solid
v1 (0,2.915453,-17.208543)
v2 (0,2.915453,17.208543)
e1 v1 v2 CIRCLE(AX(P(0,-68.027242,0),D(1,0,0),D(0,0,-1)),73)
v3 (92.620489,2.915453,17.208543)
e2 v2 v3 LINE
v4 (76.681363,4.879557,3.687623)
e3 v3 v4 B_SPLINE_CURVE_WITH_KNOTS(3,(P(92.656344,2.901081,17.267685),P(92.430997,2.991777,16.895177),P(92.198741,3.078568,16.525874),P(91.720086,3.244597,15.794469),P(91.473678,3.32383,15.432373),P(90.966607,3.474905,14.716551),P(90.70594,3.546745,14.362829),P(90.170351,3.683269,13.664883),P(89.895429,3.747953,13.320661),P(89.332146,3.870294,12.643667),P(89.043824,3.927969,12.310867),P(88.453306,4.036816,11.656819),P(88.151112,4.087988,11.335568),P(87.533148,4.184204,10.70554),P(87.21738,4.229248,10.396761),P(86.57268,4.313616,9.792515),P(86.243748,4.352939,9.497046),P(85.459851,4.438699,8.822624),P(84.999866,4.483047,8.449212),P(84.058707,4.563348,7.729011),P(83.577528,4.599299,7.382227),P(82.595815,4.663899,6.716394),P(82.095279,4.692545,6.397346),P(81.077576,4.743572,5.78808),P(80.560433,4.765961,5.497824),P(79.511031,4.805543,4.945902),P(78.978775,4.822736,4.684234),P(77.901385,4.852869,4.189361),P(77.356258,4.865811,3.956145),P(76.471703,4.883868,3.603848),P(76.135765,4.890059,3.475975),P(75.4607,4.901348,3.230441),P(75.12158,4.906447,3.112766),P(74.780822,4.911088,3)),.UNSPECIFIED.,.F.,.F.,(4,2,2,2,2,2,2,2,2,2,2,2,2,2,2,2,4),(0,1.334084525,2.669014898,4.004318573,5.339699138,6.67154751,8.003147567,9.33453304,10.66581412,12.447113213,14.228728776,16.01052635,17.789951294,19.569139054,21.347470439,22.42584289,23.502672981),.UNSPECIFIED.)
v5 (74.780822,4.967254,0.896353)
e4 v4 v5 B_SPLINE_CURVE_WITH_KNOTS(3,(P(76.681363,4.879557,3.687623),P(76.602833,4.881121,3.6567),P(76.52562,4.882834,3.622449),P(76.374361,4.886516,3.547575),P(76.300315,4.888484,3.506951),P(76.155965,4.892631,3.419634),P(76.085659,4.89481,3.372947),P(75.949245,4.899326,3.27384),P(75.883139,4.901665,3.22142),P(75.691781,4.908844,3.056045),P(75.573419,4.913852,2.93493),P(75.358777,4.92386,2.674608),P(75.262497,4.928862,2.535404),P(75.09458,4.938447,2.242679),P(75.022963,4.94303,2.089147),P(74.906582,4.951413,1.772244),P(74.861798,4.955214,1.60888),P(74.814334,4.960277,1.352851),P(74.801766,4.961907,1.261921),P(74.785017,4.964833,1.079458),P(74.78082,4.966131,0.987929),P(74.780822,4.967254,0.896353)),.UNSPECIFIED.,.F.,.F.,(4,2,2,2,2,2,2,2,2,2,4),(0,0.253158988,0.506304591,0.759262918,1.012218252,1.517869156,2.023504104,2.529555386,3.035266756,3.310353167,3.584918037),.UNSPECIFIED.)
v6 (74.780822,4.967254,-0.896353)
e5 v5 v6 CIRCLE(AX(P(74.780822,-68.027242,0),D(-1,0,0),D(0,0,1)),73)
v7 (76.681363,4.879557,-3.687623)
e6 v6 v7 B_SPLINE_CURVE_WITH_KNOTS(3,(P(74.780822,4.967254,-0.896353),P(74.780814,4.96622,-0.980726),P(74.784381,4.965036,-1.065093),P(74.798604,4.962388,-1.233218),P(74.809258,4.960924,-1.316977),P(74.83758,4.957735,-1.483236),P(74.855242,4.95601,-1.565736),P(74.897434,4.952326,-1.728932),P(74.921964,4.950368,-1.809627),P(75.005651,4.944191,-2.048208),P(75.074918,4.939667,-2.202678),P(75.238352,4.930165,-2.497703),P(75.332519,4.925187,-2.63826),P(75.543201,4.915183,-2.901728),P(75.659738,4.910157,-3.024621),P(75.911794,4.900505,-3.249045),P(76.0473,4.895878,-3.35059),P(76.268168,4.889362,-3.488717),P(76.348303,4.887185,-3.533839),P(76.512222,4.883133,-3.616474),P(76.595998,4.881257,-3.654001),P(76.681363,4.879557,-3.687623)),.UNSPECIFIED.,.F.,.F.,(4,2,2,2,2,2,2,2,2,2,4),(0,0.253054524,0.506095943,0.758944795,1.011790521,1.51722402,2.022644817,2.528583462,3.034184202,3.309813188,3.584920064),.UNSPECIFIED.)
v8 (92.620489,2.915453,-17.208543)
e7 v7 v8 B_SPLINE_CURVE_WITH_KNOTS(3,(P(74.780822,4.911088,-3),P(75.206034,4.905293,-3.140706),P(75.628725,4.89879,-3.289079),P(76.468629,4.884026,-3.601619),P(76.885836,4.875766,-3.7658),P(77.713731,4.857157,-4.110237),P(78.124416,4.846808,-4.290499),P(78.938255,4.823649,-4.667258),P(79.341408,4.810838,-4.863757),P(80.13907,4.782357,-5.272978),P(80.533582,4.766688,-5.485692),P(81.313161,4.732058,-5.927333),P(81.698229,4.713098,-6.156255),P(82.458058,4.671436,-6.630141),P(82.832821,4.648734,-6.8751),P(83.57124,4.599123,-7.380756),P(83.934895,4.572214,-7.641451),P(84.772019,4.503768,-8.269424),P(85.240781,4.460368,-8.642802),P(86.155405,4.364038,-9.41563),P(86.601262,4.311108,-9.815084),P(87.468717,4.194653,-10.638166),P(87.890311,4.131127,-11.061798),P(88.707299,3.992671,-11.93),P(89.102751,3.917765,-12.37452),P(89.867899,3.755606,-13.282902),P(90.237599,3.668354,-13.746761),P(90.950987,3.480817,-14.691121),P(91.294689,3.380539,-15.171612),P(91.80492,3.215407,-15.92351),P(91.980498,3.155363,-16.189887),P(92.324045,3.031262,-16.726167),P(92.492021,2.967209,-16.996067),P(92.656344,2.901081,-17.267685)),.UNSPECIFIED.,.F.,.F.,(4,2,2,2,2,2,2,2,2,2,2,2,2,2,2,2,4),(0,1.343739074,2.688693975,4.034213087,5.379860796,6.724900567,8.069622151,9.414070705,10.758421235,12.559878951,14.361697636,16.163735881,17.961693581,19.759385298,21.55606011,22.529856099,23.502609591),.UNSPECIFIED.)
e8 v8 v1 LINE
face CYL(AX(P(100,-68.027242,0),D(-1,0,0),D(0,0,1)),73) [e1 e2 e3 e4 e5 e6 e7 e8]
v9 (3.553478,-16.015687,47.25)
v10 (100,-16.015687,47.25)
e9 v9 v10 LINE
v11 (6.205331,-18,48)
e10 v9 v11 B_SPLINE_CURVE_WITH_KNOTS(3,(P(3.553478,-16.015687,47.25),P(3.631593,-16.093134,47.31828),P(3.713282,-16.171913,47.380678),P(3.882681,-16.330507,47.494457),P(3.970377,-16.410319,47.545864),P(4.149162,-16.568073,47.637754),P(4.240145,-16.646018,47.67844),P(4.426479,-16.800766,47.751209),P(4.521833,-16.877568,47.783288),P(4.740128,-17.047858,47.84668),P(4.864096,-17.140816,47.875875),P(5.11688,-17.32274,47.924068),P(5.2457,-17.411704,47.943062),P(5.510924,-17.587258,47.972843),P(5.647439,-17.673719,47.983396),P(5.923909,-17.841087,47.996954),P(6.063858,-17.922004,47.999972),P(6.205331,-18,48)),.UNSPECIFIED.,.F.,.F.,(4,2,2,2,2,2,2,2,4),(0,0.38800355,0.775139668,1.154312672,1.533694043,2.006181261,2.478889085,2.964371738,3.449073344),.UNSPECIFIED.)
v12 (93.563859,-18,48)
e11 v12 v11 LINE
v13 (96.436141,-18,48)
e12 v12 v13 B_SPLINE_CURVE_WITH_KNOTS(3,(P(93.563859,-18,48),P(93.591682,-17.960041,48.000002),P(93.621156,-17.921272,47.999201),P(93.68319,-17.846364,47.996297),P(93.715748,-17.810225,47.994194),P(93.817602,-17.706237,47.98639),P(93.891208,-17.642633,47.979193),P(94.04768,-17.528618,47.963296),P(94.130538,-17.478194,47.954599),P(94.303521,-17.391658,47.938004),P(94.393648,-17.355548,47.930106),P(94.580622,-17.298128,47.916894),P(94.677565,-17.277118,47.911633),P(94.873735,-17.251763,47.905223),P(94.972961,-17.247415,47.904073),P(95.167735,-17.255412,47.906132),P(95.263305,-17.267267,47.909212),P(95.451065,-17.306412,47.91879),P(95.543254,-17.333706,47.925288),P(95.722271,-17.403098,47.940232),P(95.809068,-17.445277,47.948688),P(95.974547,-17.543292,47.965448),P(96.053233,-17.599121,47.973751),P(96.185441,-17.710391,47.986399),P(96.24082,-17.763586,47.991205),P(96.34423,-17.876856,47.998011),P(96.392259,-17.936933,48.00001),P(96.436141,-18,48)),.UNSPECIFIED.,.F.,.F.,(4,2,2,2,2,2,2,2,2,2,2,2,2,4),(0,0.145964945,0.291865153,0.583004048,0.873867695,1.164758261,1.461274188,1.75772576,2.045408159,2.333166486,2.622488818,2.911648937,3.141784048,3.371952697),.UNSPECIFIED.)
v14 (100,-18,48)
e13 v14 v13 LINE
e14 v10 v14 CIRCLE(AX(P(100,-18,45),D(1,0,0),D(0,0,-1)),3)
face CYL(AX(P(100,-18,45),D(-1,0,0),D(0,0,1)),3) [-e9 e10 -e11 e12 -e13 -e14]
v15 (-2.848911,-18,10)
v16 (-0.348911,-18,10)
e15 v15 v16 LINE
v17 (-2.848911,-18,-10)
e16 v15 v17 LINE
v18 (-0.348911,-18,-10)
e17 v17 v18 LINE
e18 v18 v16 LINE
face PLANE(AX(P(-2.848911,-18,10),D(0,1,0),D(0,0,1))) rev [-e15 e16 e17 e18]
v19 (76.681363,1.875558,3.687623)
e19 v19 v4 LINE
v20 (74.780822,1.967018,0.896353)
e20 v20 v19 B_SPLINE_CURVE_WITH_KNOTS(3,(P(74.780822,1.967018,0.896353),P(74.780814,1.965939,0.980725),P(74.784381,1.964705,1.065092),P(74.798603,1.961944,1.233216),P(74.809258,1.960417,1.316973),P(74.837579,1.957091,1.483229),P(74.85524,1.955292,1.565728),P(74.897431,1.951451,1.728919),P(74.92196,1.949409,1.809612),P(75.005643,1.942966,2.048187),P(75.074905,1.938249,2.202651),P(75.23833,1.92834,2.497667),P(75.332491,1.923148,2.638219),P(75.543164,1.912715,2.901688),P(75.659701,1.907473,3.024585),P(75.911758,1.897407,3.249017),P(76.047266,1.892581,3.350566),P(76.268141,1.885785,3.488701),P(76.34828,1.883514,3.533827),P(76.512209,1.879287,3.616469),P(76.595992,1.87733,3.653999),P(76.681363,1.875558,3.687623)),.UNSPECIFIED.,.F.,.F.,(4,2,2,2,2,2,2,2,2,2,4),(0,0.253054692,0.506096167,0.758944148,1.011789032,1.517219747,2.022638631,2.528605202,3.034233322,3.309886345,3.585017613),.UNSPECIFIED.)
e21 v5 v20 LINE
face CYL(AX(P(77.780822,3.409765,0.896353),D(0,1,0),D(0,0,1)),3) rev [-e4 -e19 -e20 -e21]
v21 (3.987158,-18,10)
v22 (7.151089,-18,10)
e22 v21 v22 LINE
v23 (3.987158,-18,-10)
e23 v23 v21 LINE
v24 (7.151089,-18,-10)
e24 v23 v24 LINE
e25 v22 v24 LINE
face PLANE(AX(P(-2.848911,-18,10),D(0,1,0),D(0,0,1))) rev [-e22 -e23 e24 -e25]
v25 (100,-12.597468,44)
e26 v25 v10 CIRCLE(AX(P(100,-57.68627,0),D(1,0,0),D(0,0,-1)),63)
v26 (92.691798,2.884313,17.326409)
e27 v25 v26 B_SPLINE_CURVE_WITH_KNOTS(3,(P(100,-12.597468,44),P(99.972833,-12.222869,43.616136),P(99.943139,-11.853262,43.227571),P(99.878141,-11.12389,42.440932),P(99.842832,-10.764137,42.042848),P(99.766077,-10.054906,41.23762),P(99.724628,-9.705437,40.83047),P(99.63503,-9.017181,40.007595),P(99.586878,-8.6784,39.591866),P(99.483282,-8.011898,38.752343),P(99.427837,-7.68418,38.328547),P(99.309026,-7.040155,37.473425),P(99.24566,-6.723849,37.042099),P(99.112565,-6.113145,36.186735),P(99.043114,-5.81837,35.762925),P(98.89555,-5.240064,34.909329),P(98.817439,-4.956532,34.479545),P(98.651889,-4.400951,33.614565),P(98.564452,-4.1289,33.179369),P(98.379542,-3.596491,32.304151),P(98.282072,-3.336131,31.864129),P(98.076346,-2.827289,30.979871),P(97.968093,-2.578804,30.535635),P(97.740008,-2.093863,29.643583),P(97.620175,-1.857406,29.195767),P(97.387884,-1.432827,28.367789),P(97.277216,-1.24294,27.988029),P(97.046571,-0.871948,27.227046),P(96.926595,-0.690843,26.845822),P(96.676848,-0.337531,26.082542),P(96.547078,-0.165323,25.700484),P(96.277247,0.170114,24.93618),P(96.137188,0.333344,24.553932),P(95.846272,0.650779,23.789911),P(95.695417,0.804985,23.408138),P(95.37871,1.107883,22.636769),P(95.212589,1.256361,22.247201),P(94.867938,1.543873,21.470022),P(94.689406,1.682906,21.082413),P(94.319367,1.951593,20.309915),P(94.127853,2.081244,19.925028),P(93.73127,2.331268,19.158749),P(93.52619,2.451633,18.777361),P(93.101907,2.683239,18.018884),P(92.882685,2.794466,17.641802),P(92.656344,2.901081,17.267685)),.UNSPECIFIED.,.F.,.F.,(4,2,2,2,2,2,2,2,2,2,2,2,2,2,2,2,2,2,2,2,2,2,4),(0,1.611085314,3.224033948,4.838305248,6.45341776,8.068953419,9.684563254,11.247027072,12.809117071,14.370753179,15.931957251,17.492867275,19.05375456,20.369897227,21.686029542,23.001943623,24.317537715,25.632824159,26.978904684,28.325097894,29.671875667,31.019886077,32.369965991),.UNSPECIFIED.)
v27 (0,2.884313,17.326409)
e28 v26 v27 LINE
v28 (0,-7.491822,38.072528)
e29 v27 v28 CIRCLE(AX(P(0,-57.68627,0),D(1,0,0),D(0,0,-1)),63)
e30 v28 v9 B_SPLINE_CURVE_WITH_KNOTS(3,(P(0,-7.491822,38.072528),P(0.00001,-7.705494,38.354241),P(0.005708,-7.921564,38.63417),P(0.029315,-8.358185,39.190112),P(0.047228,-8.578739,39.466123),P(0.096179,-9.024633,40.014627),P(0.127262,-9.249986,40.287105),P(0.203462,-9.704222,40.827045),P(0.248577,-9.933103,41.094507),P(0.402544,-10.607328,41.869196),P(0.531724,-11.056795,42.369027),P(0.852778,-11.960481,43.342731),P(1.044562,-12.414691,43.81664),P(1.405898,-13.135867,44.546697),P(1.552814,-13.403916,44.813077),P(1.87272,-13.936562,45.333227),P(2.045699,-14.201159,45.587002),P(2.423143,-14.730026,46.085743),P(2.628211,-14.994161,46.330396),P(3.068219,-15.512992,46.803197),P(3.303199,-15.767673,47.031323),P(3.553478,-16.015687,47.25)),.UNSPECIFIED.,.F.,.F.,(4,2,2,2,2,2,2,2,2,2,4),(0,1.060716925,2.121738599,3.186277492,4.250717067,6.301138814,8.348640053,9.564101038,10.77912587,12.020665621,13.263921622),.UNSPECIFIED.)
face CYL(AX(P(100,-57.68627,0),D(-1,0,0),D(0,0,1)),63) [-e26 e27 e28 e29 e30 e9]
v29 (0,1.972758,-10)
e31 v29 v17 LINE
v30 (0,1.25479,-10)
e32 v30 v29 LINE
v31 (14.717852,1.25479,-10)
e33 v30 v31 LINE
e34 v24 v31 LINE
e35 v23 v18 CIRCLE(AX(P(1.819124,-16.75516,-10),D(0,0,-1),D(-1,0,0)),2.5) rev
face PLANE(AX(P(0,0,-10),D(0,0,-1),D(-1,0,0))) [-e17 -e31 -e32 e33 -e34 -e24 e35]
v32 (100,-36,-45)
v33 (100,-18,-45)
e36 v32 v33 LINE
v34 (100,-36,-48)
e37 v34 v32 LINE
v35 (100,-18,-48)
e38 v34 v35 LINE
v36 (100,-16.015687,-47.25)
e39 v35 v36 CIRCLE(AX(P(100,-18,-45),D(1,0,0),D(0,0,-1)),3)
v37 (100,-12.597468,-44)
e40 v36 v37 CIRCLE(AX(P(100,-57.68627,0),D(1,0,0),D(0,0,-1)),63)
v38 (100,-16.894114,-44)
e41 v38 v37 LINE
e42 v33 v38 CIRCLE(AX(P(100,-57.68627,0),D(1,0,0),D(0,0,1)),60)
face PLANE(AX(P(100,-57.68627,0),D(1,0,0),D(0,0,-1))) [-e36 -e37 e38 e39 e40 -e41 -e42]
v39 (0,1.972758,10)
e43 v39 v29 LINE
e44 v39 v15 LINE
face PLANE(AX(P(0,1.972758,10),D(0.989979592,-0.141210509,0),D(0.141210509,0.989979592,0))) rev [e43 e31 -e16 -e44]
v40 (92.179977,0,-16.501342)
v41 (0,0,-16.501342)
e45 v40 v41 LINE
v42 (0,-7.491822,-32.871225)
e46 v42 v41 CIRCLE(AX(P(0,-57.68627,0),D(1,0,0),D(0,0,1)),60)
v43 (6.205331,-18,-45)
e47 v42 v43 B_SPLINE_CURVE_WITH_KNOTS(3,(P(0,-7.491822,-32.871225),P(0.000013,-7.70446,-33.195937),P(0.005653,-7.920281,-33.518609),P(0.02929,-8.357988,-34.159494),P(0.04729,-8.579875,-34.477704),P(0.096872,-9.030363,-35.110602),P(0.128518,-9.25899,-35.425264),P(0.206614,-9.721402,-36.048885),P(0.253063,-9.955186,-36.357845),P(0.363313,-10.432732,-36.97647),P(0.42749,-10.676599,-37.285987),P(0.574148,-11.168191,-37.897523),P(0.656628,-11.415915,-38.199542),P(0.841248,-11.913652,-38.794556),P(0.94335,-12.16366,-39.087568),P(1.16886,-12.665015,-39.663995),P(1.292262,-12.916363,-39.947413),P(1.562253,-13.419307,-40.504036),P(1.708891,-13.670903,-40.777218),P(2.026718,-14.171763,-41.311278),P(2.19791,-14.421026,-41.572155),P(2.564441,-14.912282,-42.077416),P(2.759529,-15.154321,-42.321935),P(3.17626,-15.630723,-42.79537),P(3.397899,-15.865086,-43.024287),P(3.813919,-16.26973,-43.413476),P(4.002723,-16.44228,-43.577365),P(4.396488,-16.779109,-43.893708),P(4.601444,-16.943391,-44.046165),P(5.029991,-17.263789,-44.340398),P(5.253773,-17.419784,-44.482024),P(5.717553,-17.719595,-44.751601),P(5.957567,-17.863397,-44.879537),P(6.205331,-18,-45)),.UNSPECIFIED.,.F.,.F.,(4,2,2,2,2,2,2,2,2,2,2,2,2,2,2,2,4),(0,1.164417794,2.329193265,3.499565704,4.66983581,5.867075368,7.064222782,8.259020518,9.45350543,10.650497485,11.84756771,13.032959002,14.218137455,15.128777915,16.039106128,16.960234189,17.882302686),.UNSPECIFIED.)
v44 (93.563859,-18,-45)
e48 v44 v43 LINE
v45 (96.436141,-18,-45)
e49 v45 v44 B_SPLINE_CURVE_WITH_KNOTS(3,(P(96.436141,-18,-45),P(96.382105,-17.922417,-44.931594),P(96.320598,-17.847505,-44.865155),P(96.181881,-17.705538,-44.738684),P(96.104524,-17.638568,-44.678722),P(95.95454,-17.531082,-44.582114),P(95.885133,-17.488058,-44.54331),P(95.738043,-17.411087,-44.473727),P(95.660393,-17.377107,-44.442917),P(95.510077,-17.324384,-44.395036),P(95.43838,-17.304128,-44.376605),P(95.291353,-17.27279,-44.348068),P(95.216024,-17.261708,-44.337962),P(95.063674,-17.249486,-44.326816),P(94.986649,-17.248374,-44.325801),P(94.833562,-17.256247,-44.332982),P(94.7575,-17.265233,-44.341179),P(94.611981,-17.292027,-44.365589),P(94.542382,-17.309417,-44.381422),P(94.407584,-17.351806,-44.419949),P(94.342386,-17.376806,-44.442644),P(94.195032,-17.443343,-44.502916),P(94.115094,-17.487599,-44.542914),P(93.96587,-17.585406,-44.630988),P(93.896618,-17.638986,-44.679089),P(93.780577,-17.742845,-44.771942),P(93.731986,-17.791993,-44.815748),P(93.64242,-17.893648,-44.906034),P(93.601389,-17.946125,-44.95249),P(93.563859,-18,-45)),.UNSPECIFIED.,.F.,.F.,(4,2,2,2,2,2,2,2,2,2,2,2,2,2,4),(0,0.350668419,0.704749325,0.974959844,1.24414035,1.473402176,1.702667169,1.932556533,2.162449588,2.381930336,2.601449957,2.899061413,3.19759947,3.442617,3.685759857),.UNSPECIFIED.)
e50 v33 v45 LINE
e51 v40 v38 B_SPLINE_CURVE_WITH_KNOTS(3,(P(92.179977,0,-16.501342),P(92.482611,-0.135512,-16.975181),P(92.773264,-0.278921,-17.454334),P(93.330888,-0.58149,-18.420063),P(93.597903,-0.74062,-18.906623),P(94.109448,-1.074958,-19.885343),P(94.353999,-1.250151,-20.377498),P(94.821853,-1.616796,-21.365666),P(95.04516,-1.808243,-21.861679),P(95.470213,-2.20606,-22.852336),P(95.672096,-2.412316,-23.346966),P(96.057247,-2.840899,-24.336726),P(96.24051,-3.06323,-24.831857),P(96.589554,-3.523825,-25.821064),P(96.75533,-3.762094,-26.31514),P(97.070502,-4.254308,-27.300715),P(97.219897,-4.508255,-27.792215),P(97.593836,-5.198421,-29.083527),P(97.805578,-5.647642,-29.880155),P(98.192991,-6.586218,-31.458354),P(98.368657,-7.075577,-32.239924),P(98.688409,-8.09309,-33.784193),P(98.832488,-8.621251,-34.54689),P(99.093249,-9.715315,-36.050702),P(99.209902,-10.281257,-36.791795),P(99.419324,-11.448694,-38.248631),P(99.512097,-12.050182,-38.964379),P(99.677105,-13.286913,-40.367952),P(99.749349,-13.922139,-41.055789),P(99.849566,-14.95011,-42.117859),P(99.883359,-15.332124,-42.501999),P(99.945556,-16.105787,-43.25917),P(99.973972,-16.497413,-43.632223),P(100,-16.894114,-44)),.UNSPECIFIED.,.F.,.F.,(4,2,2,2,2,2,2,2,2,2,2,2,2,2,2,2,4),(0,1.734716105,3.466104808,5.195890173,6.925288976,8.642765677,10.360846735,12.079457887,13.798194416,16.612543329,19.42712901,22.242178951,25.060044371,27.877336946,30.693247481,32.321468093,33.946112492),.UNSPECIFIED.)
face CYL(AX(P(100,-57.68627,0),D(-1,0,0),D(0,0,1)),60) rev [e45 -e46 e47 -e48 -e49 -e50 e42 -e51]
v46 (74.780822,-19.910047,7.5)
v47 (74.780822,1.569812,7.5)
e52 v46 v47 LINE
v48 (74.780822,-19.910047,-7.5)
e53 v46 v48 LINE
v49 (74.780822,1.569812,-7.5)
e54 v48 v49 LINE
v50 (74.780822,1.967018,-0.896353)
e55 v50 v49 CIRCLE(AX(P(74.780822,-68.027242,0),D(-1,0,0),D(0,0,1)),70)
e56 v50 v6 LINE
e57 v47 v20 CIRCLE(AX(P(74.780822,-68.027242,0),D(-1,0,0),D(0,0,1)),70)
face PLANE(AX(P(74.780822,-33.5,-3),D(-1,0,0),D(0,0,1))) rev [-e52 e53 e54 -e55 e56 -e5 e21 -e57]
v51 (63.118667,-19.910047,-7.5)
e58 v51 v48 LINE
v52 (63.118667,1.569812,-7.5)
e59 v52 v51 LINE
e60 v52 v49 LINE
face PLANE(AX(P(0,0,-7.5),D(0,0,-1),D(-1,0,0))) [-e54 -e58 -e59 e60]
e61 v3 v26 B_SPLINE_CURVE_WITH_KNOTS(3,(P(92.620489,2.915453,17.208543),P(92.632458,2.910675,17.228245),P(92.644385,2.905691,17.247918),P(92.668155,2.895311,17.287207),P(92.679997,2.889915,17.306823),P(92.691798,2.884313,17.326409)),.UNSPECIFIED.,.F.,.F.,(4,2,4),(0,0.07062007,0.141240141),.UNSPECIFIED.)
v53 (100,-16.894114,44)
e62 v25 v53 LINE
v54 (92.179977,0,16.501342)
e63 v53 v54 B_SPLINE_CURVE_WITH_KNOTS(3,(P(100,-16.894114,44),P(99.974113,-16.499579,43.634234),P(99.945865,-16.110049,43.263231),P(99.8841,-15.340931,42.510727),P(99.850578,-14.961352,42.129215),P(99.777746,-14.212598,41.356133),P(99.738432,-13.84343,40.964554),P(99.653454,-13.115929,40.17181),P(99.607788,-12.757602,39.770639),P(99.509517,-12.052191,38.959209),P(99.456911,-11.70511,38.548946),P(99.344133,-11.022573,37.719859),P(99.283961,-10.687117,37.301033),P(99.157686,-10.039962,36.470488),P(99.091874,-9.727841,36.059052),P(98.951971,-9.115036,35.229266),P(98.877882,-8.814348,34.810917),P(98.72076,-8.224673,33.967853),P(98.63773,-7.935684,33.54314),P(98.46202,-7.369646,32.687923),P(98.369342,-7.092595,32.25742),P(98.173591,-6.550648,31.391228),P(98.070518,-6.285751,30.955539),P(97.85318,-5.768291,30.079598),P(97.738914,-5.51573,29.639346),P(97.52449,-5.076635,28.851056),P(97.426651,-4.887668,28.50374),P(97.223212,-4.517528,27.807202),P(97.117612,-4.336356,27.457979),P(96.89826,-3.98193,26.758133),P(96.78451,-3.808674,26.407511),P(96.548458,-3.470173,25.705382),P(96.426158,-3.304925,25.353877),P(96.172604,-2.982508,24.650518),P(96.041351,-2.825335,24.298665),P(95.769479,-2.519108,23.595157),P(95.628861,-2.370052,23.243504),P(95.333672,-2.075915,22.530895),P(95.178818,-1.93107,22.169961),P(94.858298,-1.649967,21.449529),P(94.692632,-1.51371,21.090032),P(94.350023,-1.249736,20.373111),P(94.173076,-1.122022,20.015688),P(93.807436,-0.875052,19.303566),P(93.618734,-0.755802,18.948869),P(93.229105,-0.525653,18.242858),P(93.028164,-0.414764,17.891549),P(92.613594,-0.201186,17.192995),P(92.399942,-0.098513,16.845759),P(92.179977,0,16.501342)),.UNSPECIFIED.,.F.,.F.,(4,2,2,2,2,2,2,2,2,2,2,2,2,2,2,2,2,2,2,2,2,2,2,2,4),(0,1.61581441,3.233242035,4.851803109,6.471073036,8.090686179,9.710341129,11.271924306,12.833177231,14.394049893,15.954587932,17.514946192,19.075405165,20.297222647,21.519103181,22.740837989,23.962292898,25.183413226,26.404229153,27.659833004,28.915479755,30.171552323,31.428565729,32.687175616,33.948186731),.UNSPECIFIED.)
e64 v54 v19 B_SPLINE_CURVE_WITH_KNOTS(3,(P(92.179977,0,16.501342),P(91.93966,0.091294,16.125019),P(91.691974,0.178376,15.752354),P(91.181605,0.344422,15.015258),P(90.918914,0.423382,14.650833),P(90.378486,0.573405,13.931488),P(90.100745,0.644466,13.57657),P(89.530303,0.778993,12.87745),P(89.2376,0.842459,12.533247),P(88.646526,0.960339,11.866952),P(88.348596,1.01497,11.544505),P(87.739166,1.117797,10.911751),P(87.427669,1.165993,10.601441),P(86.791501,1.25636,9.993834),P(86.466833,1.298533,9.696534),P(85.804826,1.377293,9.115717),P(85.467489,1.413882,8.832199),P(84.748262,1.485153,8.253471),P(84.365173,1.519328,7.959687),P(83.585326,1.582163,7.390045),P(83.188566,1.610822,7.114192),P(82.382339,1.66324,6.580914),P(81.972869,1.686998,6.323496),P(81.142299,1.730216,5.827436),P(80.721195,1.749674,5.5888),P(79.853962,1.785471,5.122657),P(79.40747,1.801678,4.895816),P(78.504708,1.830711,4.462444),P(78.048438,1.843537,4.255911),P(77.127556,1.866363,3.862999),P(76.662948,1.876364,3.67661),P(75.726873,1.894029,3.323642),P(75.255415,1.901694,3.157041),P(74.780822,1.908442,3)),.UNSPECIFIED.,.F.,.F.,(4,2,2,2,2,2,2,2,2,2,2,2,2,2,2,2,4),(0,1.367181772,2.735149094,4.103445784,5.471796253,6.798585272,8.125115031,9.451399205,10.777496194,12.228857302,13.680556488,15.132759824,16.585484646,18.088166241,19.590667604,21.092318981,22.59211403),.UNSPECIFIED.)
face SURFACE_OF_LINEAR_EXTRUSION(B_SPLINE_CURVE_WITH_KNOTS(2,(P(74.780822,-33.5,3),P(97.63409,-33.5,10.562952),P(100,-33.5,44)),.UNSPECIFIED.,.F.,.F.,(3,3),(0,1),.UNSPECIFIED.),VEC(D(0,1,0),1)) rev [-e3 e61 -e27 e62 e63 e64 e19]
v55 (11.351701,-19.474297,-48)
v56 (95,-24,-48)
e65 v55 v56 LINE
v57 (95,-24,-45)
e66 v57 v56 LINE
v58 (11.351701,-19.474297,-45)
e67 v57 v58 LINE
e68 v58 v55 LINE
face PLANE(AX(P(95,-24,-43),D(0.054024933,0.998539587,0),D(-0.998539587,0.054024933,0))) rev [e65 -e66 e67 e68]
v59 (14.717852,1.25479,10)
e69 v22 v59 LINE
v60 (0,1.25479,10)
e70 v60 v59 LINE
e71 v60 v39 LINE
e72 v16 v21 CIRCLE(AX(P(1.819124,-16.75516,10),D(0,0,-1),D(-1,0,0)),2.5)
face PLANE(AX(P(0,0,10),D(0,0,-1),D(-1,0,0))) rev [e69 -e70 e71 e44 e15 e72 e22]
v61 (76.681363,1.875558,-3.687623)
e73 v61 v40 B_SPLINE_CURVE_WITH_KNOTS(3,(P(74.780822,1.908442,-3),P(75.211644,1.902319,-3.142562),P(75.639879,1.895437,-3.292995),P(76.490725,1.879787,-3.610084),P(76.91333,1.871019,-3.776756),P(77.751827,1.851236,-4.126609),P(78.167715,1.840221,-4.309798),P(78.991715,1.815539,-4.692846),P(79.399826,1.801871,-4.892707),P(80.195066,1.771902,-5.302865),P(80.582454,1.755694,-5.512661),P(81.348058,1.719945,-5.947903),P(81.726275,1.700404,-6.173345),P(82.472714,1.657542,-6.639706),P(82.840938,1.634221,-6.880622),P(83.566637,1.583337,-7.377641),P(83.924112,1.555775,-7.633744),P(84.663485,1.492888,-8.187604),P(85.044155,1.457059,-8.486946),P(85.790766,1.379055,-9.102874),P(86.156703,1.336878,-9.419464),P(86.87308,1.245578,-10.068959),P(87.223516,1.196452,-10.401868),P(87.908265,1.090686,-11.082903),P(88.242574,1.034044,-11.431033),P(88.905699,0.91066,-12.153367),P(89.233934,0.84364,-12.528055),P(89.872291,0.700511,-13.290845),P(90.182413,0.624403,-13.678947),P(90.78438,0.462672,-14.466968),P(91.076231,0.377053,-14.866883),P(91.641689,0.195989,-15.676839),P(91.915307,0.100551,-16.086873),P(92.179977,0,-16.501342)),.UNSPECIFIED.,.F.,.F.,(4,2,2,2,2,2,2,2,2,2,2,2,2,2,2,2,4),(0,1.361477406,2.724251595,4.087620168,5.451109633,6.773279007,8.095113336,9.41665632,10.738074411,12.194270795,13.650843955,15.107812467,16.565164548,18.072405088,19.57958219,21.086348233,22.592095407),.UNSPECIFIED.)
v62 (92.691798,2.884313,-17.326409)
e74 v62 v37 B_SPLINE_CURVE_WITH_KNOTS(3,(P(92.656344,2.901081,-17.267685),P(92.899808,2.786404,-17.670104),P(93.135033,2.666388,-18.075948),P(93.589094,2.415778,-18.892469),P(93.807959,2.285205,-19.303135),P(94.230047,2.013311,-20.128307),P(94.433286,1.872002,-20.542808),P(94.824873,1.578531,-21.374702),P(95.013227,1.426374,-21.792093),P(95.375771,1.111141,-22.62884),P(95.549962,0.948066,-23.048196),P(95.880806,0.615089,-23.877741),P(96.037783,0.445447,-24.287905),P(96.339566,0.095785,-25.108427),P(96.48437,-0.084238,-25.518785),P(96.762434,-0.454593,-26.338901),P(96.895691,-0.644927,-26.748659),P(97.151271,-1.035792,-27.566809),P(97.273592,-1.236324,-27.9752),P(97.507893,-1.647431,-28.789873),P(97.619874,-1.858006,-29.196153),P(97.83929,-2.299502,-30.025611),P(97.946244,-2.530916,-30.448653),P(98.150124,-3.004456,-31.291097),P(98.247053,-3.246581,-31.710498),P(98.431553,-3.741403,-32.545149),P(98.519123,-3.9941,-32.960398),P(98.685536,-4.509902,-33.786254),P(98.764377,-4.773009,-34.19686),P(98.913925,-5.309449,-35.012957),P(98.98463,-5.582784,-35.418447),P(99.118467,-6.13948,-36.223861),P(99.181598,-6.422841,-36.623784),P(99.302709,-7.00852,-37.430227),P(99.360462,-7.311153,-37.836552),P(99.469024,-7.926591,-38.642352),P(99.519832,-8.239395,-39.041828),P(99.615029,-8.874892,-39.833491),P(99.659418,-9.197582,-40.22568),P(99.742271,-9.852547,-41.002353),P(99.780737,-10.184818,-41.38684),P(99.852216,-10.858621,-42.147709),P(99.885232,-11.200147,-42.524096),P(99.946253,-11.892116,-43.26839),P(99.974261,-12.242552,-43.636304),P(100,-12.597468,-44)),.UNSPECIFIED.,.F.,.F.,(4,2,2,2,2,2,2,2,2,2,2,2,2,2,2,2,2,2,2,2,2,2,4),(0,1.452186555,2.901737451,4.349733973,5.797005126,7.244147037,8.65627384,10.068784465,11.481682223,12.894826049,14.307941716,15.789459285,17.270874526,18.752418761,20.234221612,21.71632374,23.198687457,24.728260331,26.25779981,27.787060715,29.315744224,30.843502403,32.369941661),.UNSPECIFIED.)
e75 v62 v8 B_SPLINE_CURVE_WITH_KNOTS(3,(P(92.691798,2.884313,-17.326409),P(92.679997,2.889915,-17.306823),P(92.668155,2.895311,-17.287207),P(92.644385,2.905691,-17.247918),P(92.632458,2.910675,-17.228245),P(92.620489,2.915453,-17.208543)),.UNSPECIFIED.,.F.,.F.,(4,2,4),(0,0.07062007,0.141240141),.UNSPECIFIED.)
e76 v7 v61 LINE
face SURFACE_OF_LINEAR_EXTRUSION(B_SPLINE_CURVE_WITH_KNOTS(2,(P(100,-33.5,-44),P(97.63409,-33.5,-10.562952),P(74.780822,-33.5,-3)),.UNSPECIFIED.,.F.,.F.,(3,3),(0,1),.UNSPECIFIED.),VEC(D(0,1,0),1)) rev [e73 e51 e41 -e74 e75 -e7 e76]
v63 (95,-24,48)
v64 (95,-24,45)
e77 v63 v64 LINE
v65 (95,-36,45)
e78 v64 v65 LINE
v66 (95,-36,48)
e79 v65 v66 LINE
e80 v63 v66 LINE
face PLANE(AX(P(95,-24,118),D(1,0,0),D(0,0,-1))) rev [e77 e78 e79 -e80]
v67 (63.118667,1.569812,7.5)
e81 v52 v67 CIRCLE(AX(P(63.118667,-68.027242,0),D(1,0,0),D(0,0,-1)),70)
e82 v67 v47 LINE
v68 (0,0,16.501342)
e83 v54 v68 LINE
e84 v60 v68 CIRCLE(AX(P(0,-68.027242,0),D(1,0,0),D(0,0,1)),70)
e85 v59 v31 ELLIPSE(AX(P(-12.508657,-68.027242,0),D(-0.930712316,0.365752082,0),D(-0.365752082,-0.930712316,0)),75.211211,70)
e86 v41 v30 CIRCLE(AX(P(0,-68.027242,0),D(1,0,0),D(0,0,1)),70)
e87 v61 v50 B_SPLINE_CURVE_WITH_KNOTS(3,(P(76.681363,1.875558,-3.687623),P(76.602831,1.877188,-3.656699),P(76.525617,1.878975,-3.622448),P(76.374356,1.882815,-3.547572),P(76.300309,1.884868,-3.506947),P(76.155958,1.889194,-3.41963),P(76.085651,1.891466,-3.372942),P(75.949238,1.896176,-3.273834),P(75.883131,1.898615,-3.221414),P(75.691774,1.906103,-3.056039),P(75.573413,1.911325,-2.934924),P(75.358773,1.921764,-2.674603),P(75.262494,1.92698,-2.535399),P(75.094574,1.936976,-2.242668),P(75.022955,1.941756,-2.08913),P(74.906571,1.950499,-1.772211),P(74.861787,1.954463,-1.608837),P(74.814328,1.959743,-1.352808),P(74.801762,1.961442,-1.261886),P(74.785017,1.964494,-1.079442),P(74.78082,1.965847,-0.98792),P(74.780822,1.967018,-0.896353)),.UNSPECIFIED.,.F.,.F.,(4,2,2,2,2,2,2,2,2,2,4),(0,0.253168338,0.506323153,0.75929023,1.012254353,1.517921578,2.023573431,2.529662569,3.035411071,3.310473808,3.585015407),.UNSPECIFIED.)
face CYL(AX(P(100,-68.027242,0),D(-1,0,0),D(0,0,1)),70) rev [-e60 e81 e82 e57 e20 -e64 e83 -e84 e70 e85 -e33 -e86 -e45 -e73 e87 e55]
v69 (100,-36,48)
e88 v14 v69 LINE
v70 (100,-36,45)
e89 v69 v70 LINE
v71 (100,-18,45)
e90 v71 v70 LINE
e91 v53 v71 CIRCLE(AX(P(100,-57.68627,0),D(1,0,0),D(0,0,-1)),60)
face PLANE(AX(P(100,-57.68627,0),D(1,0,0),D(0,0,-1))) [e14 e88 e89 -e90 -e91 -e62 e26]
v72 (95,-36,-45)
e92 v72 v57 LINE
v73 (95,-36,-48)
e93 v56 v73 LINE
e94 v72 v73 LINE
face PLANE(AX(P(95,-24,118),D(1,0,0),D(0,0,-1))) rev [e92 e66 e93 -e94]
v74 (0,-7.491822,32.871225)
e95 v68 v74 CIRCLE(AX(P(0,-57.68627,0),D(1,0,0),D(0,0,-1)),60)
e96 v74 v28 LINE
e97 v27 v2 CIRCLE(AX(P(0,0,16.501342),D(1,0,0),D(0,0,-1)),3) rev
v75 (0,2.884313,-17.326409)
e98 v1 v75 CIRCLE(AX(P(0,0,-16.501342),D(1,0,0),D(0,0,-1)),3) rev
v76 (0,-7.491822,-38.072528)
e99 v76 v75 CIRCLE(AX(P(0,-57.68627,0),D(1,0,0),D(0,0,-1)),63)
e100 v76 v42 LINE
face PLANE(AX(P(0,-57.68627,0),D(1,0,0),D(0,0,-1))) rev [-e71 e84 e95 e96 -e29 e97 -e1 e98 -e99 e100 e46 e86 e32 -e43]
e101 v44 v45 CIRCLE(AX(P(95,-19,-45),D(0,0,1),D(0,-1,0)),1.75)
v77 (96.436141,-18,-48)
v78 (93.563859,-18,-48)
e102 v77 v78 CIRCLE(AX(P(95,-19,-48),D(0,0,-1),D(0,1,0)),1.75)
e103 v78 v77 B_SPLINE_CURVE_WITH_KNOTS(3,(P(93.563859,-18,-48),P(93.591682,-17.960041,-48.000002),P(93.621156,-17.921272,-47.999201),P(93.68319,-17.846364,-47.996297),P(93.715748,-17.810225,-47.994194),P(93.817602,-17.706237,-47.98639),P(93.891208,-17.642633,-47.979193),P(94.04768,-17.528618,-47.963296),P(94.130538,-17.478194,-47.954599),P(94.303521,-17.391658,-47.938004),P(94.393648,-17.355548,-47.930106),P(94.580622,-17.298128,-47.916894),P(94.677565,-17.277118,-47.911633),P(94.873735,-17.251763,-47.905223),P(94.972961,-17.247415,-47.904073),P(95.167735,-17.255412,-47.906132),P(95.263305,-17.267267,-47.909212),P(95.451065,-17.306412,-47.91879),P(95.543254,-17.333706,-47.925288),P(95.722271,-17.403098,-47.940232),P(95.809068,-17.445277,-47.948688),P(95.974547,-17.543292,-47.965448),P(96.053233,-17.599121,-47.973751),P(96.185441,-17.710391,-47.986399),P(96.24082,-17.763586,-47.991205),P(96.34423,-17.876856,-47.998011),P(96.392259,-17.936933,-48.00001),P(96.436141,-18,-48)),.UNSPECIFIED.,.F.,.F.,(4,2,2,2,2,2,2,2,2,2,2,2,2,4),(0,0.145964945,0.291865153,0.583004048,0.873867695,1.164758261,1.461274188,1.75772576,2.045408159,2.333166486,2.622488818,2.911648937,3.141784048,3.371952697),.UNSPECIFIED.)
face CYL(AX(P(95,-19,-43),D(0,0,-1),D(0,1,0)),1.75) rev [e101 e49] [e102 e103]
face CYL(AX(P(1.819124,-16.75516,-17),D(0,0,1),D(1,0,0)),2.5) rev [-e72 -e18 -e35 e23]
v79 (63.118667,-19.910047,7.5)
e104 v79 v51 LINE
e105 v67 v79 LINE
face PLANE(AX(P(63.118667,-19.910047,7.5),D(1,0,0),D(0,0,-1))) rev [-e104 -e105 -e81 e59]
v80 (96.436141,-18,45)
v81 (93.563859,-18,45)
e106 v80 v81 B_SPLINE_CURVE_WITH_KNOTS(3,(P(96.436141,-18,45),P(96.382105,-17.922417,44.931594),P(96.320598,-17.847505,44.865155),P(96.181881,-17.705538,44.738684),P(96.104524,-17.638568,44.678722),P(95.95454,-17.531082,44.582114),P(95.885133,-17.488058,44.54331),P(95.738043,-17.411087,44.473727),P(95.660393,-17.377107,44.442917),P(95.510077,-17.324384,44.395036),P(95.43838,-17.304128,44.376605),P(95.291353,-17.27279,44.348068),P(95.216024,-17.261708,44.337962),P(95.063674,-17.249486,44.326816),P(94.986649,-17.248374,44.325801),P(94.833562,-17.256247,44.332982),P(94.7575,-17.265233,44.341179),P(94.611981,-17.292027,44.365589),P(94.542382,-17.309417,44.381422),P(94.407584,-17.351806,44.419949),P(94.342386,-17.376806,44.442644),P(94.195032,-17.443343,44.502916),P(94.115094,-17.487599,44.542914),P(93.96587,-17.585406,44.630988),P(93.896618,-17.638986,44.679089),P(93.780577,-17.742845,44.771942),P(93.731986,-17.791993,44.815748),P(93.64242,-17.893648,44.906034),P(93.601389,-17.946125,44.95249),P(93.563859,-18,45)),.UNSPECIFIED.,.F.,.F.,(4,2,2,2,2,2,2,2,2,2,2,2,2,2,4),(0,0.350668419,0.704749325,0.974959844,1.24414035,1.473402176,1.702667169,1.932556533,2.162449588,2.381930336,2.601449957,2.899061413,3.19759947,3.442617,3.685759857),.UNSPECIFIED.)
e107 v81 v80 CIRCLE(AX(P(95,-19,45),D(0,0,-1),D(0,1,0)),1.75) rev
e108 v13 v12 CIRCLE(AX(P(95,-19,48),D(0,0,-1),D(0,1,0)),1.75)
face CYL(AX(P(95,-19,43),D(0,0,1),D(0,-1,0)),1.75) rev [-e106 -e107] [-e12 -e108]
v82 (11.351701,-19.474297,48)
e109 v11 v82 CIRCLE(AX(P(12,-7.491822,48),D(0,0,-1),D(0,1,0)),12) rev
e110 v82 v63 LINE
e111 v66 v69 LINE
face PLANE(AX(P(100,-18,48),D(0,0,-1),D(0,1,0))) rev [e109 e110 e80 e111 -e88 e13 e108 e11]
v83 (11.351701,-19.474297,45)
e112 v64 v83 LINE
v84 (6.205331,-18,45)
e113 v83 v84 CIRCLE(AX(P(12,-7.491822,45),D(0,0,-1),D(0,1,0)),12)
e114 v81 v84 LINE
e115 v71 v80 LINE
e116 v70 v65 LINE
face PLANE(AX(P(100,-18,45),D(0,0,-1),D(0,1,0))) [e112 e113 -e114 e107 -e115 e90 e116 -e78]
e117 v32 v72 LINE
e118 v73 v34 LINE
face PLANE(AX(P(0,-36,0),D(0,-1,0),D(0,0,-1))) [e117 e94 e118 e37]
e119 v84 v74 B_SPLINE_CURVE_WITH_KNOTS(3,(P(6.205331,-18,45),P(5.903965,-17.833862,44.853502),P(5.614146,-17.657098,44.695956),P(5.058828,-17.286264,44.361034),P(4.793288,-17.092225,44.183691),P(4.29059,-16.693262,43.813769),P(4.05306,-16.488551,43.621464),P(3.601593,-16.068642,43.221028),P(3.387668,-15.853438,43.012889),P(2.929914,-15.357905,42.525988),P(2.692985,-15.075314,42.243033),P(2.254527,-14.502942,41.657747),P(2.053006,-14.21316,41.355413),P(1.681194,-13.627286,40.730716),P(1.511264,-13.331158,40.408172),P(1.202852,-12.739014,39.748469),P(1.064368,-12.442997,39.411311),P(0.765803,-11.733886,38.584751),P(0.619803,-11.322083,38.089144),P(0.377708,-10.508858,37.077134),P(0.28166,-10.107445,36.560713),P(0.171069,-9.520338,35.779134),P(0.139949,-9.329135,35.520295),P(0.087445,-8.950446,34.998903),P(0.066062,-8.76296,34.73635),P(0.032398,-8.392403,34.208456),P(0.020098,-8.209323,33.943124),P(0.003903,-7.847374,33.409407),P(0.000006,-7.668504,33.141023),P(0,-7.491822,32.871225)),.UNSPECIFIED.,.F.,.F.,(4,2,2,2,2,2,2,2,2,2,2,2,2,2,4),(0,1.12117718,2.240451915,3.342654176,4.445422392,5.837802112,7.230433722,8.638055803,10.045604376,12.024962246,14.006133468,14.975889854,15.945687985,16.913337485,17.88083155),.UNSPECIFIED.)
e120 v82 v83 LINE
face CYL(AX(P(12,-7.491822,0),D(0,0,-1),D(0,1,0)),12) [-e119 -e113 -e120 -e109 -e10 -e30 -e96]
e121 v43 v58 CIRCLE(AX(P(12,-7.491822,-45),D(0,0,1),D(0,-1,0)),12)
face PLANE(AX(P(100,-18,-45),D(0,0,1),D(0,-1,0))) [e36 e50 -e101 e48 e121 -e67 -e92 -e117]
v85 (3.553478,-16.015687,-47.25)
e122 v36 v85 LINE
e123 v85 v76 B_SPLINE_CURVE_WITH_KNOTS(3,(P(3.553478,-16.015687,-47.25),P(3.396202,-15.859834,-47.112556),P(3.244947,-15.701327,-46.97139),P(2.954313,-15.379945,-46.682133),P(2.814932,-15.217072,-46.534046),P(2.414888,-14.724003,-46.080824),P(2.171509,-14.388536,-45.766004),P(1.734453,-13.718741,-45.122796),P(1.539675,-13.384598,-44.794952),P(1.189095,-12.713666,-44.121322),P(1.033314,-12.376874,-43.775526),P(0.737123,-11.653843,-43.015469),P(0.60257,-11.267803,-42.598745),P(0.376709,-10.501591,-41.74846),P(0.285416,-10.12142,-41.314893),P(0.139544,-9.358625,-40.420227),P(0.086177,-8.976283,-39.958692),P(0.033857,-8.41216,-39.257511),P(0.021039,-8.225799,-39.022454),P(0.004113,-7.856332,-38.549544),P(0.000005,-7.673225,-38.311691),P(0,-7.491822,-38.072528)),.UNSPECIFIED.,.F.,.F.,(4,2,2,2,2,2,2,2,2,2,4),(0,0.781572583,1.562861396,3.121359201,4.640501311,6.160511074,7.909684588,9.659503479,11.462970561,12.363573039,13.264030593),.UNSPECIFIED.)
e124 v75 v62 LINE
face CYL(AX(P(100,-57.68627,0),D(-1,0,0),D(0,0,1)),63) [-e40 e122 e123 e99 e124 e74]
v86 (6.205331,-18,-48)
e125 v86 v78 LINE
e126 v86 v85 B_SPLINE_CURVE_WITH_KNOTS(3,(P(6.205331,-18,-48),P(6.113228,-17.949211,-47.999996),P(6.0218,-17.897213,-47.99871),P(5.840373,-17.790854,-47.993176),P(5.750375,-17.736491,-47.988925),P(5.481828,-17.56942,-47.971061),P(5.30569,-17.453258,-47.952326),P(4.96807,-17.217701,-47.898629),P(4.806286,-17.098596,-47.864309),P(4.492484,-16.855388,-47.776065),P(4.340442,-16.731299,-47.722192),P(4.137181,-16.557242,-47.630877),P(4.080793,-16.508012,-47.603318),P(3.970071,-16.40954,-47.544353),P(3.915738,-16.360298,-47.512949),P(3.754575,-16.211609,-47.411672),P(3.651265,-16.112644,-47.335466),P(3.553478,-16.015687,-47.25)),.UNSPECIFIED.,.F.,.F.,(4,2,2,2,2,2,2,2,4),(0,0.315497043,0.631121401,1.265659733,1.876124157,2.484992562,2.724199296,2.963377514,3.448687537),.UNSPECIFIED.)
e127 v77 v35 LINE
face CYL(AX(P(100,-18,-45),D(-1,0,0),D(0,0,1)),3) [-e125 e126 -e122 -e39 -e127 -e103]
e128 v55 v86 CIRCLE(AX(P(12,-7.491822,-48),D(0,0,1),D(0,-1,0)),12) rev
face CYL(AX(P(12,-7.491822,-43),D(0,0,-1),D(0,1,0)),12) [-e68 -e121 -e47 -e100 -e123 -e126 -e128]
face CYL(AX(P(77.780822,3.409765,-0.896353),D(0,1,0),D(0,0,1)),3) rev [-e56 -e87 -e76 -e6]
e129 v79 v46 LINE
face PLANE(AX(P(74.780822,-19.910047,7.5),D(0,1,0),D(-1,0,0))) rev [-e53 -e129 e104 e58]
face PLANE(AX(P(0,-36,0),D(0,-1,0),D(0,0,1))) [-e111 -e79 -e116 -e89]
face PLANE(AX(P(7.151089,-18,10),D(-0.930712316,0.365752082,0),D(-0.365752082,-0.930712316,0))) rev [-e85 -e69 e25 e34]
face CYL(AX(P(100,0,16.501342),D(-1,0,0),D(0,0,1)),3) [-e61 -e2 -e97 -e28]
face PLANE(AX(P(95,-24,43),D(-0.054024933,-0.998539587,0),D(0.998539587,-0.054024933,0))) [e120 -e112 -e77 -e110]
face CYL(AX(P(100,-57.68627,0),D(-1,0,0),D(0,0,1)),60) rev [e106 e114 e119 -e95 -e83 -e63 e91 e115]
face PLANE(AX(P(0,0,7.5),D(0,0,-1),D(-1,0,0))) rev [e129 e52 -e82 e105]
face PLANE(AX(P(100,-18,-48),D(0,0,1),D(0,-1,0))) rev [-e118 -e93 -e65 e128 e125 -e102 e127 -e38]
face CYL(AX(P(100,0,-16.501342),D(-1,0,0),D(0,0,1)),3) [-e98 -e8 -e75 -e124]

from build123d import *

# Parameters (mm, degrees)
EXTRUDE_THIN1_DEPTH = 100
CUT_EXTRUDE2_DEPTH  = 33.5
FILLET1_R           = 3
SKETCH6_W           = 108.670856817
SKETCH6_H           = 17.879774232
CUT_EXTRUDE3_DEPTH  = 166
BOSS_EXTRUDE1_DEPTH = 10
CUT_EXTRUDE4_DEPTH  = 27
SKETCH11_R          = 1.75
CUT_EXTRUDE5_DEPTH  = 5
SKETCH12_W          = 11.662154679
SKETCH12_H          = 21.882804931
BOSS_EXTRUDE2_DEPTH = 7.5
CUT_EXTRUDE7_DEPTH  = 5
FILLET5_R           = 12
SKETCH16_W          = 5
SKETCH16_H          = 3
BOSS_EXTRUDE3_DEPTH = 4


with BuildPart() as part:
    # Sketch1 → Extrude-Thin1 (new body)
    with BuildSketch(Plane(origin=(0, 0, 0), x_dir=(0, 0, -1), z_dir=(1, 0, 0))):
        with BuildLine():
            Line((45, -32), (45, -18))
            ThreePointArc((45, -18), (32.040658091, -6.957616726), (16.501342128, 0))
            ThreePointArc((16.501342128, 0), (0, 1.972757604), (-16.501342128, 0))
            ThreePointArc((-16.501342128, 0), (-32.040658091, -6.957616726), (-45, -18))
            Line((-45, -18), (-45, -32))
            Line((-45, -32), (-48, -32))
            Line((-48, -32), (-48, -16.88185814))
            ThreePointArc((-48, -16.88185814), (-34.099982932, -4.712774746), (-17.26768466, 2.901081048))
            ThreePointArc((-17.26768466, 2.901081048), (0, 4.972757604), (17.26768466, 2.901081048))
            ThreePointArc((17.26768466, 2.901081048), (34.099982932, -4.712774746), (48, -16.88185814))
            Line((48, -16.88185814), (48, -32))
            Line((48, -32), (45, -32))
        make_face()
    extrude(amount=EXTRUDE_THIN1_DEPTH)

    # Sketch5 → Cut-Extrude2 (cut, symmetric)
    with BuildSketch(Plane(origin=(0, 0, 0), x_dir=(1, 0, 0), z_dir=(0, 1, 0))):
        with BuildLine():
            Line((74.78082212, 3), (74.78082212, -3))
            add(Edge.make_bspline(
                [(74.78082212, -3), (97.634090292, -10.562952057), (100, -44)],
                knots=[0, 0, 0, 1, 1, 1], degree=2))
            Line((100, -44), (100, 44))
            add(Edge.make_bspline(
                [(74.78082212, 3), (97.634090292, 10.562952057), (100, 44)],
                knots=[0, 0, 0, 1, 1, 1], degree=2))
        make_face()
    extrude(amount=CUT_EXTRUDE2_DEPTH, both=True, mode=Mode.SUBTRACT)

    # Fillet1
    fillet1_edges = [part.edges().sort_by_distance(p)[0] for p in [
        (50, -16.88185814, -48),
        (50, -16.88185814, 48),
        (74.78082212, 3.409765032, 3),
        (74.78082212, 3.409765032, -3),
        (46.328171757, 2.901081048, -17.26768466),
        (46.328171757, 2.901081048, 17.26768466),
    ]]
    fillet(fillet1_edges, radius=FILLET1_R)

    # Sketch6 → Cut-Extrude3 (cut)
    with BuildSketch(Plane(origin=(0, 0, -48), x_dir=(-1, 0, 0), z_dir=(0, 0, -1))):
        with Locations((-40.664571591, -32.939887116)):
            Rectangle(SKETCH6_W, SKETCH6_H)
    extrude(amount=-CUT_EXTRUDE3_DEPTH, mode=Mode.SUBTRACT)

    # Sketch8 → Boss-Extrude1 (add, symmetric)
    with BuildSketch(Plane.XY):
        Polygon((0, 1.972757604), (-2.848910504, -18), (7.151089496, -18), (15, 1.972757604), align=None)
    extrude(amount=BOSS_EXTRUDE1_DEPTH, both=True)

    # Sketch10 → Cut-Extrude4 (cut)
    with BuildSketch(Plane.XY.offset(10)):
        with BuildLine():
            Line((-0.348910504, -18), (3.987157996, -18))
            ThreePointArc((3.987157996, -18), (1.819123746, -14.255159652), (-0.348910504, -18))
        make_face()
    extrude(amount=-CUT_EXTRUDE4_DEPTH, mode=Mode.SUBTRACT)

    # Sketch11 → Cut-Extrude5 (cut)
    with BuildSketch(Plane(origin=(0, 0, -48), x_dir=(-1, 0, 0), z_dir=(0, 0, -1))):
        with Locations(Location((-95, -19, 0), (0, 0, 34.849904579))):
            Circle(SKETCH11_R)
    cut_extrude5 = extrude(amount=-CUT_EXTRUDE5_DEPTH, mode=Mode.SUBTRACT)

    # Mirror1: Cut-Extrude5 across plane
    add(cut_extrude5.mirror(Plane.XY), mode=Mode.SUBTRACT)

    # Sketch12 → Boss-Extrude2 (add, symmetric)
    with BuildSketch(Plane.XY):
        with Locations((68.949744781, -8.968644861)):
            Rectangle(SKETCH12_W, SKETCH12_H)
    extrude(amount=BOSS_EXTRUDE2_DEPTH, both=True)

    # Sketch15 → Cut-Extrude7 (cut)
    with BuildSketch(Plane(origin=(0, 0, -48), x_dir=(-1, 0, 0), z_dir=(0, 0, -1))):
        Polygon((-95, -24), (0, -18.860125055), (0, -26.57204687), align=None)
    cut_extrude7 = extrude(amount=-CUT_EXTRUDE7_DEPTH, mode=Mode.SUBTRACT)

    # Mirror2: Cut-Extrude7 across plane
    add(cut_extrude7.mirror(Plane.XY), mode=Mode.SUBTRACT)

    # Fillet5
    # the kernel refuses this fillet: 12 mm, written as the material it takes off along each edge
    with BuildSketch(Plane(origin=(0, -18.860125055, 76.420758066), x_dir=(0, 1, 0), z_dir=(0, 0, -1))) as fillet5_piece_1:
        with BuildLine():
            CenterArc((FILLET5_R * 0.947358602211, FILLET5_R), FILLET5_R, 183.096908366, 86.903091634)
            Line((-FILLET5_R * 0.0511809847104, FILLET5_R * 0.945975067318), (0, 0))
            Line((0, 0), (FILLET5_R * 0.947358602211, 0))
        make_face()
    extrude(amount=59.841516133, mode=Mode.SUBTRACT)
    with BuildSketch(Plane(origin=(0, -18.860125055, -76.420758066), x_dir=(0, 1, 0), z_dir=(0, 0, 1))) as fillet5_piece_2:
        with BuildLine():
            CenterArc((FILLET5_R * 0.947358602211, -FILLET5_R), FILLET5_R, 90, 86.903091634)
            Line((-FILLET5_R * 0.0511809847104, -FILLET5_R * 0.945975067318), (0, 0))
            Line((0, 0), (FILLET5_R * 0.947358602211, 0))
        make_face()
    extrude(amount=59.841516133, mode=Mode.SUBTRACT)

    # Sketch16 → Boss-Extrude3 (add)
    with BuildSketch(Plane.XZ.offset(32)):
        with Locations((97.5, -46.5)):
            Rectangle(SKETCH16_W, SKETCH16_H)
    boss_extrude3 = extrude(amount=BOSS_EXTRUDE3_DEPTH)

    # Mirror3: Boss-Extrude3 across plane
    add(boss_extrude3.mirror(Plane.XY))


solid = part.part
